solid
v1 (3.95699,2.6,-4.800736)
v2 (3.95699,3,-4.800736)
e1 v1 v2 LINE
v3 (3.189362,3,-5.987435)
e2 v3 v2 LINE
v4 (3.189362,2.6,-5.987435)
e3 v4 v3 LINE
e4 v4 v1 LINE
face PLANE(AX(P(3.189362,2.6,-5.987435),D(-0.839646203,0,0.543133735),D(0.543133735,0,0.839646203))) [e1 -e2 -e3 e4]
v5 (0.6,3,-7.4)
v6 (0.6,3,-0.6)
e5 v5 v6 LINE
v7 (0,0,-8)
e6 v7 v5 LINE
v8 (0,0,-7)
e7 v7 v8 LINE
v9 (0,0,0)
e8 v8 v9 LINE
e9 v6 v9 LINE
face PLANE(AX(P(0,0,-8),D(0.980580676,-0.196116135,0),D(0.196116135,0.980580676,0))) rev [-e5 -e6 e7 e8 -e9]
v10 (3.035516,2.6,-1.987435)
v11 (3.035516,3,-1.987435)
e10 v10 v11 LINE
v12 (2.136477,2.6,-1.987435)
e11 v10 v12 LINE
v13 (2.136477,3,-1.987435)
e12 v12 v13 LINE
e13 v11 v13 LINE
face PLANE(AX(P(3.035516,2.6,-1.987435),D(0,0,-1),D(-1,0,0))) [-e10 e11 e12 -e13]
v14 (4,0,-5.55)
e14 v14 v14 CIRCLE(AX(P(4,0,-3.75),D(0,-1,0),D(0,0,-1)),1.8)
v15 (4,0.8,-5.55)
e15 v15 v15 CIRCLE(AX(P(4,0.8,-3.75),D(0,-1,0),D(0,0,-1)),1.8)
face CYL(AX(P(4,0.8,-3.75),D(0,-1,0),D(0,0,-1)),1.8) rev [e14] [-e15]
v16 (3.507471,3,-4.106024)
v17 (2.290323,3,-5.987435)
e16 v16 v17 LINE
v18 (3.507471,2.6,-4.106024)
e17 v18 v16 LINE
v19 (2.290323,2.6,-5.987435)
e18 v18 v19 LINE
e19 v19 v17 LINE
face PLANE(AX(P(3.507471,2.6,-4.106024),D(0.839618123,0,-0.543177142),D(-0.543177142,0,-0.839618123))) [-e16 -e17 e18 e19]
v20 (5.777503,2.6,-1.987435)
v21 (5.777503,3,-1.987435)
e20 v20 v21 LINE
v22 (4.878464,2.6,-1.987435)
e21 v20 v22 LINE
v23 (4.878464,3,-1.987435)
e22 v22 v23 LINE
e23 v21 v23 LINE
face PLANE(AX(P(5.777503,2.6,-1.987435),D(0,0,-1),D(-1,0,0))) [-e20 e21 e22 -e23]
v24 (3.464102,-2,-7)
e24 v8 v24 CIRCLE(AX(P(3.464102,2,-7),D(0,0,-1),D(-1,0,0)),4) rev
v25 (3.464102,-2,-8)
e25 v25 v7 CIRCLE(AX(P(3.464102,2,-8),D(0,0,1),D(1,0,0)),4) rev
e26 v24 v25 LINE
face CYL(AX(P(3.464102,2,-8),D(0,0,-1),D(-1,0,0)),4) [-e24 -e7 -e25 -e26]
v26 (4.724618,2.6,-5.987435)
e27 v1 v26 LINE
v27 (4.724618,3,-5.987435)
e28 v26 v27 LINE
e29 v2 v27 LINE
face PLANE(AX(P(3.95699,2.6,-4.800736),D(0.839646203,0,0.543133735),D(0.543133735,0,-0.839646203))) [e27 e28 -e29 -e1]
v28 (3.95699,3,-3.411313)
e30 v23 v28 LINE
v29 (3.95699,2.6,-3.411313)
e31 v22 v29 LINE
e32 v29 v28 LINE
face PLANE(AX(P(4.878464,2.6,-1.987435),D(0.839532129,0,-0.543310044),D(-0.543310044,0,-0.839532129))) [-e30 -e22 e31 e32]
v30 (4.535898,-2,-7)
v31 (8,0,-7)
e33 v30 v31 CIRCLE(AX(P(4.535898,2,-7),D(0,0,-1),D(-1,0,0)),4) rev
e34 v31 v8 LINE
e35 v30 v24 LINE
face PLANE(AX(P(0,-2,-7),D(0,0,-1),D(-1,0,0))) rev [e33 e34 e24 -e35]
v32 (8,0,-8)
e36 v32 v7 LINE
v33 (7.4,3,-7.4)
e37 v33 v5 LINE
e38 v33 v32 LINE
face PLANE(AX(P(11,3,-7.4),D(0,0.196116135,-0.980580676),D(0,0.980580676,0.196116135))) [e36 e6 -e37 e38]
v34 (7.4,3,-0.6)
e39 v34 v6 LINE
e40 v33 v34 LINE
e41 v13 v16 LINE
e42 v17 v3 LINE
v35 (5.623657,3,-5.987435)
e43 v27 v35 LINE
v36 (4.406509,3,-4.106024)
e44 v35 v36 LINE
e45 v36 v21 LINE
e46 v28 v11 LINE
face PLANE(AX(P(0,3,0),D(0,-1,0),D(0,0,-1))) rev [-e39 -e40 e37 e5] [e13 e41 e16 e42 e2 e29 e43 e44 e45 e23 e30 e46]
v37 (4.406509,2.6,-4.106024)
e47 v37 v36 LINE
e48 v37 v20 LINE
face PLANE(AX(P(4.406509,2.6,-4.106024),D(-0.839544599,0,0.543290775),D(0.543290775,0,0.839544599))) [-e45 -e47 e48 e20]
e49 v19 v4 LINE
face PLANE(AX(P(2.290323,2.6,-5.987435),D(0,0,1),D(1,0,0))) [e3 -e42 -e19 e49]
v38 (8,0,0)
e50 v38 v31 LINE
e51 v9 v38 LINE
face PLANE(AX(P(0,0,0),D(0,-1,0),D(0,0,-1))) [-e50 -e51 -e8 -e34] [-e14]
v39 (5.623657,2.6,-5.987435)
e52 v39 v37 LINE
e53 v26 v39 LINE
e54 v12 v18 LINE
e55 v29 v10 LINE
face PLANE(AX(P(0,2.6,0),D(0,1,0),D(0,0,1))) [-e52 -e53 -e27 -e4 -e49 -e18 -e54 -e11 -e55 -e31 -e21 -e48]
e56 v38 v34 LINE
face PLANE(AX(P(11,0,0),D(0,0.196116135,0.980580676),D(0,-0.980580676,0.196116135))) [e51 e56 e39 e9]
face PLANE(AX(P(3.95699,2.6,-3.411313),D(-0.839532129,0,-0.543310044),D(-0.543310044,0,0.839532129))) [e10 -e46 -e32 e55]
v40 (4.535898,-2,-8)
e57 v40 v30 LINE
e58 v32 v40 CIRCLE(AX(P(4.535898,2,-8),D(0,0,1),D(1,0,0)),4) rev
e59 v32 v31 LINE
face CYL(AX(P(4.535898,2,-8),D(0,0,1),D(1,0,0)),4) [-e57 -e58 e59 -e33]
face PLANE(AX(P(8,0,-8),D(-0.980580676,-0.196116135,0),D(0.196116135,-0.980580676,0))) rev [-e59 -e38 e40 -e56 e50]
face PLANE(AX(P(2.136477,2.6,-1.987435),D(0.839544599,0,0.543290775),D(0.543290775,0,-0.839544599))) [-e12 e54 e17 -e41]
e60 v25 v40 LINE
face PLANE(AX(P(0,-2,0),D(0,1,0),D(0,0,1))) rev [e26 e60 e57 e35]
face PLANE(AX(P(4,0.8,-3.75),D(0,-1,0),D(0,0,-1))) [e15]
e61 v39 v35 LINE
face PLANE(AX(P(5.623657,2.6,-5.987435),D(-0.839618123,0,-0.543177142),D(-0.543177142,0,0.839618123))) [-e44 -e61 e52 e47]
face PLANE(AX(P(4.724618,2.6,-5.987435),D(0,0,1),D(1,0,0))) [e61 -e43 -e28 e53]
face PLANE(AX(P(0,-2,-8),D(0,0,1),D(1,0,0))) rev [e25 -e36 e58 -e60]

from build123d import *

# Parameters (mm, degrees)
SKETCH1_W               = 8
SKETCH1_H               = 8
BOSS_EXTRUDE1_DEPTH     = 3
CUT_EXTRUDE1_DEPTH      = 12.704699911
CUT_EXTRUDE1_DEPTH_BACK = 12.704699911
CUT_EXTRUDE2_DEPTH      = 11
SKETCH4_R               = 1.8
CUT_EXTRUDE3_DEPTH      = 0.8
SKETCH5_W               = 8
SKETCH5_H               = 1
BOSS_EXTRUDE2_DEPTH     = 2
FILLET1_R               = 4
CUT_EXTRUDE4_DEPTH      = 0.4


with BuildPart() as part:
    # Sketch1 → Boss-Extrude1 (new body)
    with BuildSketch(Plane(origin=(0, 0, 0), x_dir=(1, 0, 0), z_dir=(0, 1, 0))):
        with Locations((4, 4)):
            Rectangle(SKETCH1_W, SKETCH1_H)
    extrude(amount=BOSS_EXTRUDE1_DEPTH)

    # Sketch2 → Cut-Extrude1 (cut, two sides: drawn at the far end of the back side and taken through both)
    with BuildSketch(Plane.XY.offset(-CUT_EXTRUDE1_DEPTH_BACK)):
        Polygon((0, 0), (0.6, 3), (0, 3), align=None)
        Polygon((8, 0), (7.4, 3), (8, 3), align=None)
    extrude(amount=CUT_EXTRUDE1_DEPTH + CUT_EXTRUDE1_DEPTH_BACK, mode=Mode.SUBTRACT)

    # Sketch3 → Cut-Extrude2 (cut)
    with BuildSketch(Plane(origin=(0, 0, 0), x_dir=(0, 0, -1), z_dir=(1, 0, 0))):
        Polygon((0, 0), (0.6, 3), (0, 3), align=None)
        Polygon((8, 3), (7.4, 3), (8, 0), align=None)
    extrude(amount=CUT_EXTRUDE2_DEPTH, mode=Mode.SUBTRACT)

    # Sketch4 → Cut-Extrude3 (cut)
    with BuildSketch(Plane.XZ):
        with Locations(Location((4, -3.75, 0), (0, 0, 270))):
            Circle(SKETCH4_R)
    extrude(amount=-CUT_EXTRUDE3_DEPTH, mode=Mode.SUBTRACT)

    # Sketch5 → Boss-Extrude2 (add)
    with BuildSketch(Plane.XZ):
        with Locations((4, -7.5)):
            Rectangle(SKETCH5_W, SKETCH5_H)
    extrude(amount=BOSS_EXTRUDE2_DEPTH)

    # Fillet1
    # the kernel refuses this fillet: 4 mm, written as the material it takes off along each edge
    with BuildSketch(Plane(origin=(8, -2, -16.660254038), x_dir=(0, 1, 0), z_dir=(0, 0, 1)), Plane(origin=(0, -2, 1.660254038), x_dir=(0, 1, 0), z_dir=(0, 0, -1))) as fillet1_piece_1:
        with BuildLine():
            CenterArc((4, 3.464101615), FILLET1_R, 180, 60)
            Line((0, 3.464101615), (-0.08, 3.464101615))
            Line((-0.08, 3.464101615), (-0.08, 0))
            Line((-0.08, 0), (0, -0.08))
            ThreePointArc((0, -0.08), (1, -0.08), (1.96, -0.069282032))
            Line((1.96, -0.069282032), (2, 0))
        make_face()
    extrude(amount=18.320508076, mode=Mode.SUBTRACT)

    # Sketch6 → Cut-Extrude4 (cut)
    with BuildSketch(Plane(origin=(0, 3, 0), x_dir=(1, 0, 0), z_dir=(0, 1, 0))):
        Polygon((2.136477101, 1.987434605), (3.507470691, 4.106024349), (2.290323255, 5.987434605), (3.189361717, 5.987434605), (3.956989922, 4.800735887), (4.724618127, 5.987434605), (5.623656589, 5.987434605), (4.406509153, 4.106024349), (5.777502742, 1.987434605), (4.878464281, 1.987434605), (3.956989922, 3.41131281), (3.035515563, 1.987434605), align=None)
    extrude(amount=-CUT_EXTRUDE4_DEPTH, mode=Mode.SUBTRACT)


solid = part.part
